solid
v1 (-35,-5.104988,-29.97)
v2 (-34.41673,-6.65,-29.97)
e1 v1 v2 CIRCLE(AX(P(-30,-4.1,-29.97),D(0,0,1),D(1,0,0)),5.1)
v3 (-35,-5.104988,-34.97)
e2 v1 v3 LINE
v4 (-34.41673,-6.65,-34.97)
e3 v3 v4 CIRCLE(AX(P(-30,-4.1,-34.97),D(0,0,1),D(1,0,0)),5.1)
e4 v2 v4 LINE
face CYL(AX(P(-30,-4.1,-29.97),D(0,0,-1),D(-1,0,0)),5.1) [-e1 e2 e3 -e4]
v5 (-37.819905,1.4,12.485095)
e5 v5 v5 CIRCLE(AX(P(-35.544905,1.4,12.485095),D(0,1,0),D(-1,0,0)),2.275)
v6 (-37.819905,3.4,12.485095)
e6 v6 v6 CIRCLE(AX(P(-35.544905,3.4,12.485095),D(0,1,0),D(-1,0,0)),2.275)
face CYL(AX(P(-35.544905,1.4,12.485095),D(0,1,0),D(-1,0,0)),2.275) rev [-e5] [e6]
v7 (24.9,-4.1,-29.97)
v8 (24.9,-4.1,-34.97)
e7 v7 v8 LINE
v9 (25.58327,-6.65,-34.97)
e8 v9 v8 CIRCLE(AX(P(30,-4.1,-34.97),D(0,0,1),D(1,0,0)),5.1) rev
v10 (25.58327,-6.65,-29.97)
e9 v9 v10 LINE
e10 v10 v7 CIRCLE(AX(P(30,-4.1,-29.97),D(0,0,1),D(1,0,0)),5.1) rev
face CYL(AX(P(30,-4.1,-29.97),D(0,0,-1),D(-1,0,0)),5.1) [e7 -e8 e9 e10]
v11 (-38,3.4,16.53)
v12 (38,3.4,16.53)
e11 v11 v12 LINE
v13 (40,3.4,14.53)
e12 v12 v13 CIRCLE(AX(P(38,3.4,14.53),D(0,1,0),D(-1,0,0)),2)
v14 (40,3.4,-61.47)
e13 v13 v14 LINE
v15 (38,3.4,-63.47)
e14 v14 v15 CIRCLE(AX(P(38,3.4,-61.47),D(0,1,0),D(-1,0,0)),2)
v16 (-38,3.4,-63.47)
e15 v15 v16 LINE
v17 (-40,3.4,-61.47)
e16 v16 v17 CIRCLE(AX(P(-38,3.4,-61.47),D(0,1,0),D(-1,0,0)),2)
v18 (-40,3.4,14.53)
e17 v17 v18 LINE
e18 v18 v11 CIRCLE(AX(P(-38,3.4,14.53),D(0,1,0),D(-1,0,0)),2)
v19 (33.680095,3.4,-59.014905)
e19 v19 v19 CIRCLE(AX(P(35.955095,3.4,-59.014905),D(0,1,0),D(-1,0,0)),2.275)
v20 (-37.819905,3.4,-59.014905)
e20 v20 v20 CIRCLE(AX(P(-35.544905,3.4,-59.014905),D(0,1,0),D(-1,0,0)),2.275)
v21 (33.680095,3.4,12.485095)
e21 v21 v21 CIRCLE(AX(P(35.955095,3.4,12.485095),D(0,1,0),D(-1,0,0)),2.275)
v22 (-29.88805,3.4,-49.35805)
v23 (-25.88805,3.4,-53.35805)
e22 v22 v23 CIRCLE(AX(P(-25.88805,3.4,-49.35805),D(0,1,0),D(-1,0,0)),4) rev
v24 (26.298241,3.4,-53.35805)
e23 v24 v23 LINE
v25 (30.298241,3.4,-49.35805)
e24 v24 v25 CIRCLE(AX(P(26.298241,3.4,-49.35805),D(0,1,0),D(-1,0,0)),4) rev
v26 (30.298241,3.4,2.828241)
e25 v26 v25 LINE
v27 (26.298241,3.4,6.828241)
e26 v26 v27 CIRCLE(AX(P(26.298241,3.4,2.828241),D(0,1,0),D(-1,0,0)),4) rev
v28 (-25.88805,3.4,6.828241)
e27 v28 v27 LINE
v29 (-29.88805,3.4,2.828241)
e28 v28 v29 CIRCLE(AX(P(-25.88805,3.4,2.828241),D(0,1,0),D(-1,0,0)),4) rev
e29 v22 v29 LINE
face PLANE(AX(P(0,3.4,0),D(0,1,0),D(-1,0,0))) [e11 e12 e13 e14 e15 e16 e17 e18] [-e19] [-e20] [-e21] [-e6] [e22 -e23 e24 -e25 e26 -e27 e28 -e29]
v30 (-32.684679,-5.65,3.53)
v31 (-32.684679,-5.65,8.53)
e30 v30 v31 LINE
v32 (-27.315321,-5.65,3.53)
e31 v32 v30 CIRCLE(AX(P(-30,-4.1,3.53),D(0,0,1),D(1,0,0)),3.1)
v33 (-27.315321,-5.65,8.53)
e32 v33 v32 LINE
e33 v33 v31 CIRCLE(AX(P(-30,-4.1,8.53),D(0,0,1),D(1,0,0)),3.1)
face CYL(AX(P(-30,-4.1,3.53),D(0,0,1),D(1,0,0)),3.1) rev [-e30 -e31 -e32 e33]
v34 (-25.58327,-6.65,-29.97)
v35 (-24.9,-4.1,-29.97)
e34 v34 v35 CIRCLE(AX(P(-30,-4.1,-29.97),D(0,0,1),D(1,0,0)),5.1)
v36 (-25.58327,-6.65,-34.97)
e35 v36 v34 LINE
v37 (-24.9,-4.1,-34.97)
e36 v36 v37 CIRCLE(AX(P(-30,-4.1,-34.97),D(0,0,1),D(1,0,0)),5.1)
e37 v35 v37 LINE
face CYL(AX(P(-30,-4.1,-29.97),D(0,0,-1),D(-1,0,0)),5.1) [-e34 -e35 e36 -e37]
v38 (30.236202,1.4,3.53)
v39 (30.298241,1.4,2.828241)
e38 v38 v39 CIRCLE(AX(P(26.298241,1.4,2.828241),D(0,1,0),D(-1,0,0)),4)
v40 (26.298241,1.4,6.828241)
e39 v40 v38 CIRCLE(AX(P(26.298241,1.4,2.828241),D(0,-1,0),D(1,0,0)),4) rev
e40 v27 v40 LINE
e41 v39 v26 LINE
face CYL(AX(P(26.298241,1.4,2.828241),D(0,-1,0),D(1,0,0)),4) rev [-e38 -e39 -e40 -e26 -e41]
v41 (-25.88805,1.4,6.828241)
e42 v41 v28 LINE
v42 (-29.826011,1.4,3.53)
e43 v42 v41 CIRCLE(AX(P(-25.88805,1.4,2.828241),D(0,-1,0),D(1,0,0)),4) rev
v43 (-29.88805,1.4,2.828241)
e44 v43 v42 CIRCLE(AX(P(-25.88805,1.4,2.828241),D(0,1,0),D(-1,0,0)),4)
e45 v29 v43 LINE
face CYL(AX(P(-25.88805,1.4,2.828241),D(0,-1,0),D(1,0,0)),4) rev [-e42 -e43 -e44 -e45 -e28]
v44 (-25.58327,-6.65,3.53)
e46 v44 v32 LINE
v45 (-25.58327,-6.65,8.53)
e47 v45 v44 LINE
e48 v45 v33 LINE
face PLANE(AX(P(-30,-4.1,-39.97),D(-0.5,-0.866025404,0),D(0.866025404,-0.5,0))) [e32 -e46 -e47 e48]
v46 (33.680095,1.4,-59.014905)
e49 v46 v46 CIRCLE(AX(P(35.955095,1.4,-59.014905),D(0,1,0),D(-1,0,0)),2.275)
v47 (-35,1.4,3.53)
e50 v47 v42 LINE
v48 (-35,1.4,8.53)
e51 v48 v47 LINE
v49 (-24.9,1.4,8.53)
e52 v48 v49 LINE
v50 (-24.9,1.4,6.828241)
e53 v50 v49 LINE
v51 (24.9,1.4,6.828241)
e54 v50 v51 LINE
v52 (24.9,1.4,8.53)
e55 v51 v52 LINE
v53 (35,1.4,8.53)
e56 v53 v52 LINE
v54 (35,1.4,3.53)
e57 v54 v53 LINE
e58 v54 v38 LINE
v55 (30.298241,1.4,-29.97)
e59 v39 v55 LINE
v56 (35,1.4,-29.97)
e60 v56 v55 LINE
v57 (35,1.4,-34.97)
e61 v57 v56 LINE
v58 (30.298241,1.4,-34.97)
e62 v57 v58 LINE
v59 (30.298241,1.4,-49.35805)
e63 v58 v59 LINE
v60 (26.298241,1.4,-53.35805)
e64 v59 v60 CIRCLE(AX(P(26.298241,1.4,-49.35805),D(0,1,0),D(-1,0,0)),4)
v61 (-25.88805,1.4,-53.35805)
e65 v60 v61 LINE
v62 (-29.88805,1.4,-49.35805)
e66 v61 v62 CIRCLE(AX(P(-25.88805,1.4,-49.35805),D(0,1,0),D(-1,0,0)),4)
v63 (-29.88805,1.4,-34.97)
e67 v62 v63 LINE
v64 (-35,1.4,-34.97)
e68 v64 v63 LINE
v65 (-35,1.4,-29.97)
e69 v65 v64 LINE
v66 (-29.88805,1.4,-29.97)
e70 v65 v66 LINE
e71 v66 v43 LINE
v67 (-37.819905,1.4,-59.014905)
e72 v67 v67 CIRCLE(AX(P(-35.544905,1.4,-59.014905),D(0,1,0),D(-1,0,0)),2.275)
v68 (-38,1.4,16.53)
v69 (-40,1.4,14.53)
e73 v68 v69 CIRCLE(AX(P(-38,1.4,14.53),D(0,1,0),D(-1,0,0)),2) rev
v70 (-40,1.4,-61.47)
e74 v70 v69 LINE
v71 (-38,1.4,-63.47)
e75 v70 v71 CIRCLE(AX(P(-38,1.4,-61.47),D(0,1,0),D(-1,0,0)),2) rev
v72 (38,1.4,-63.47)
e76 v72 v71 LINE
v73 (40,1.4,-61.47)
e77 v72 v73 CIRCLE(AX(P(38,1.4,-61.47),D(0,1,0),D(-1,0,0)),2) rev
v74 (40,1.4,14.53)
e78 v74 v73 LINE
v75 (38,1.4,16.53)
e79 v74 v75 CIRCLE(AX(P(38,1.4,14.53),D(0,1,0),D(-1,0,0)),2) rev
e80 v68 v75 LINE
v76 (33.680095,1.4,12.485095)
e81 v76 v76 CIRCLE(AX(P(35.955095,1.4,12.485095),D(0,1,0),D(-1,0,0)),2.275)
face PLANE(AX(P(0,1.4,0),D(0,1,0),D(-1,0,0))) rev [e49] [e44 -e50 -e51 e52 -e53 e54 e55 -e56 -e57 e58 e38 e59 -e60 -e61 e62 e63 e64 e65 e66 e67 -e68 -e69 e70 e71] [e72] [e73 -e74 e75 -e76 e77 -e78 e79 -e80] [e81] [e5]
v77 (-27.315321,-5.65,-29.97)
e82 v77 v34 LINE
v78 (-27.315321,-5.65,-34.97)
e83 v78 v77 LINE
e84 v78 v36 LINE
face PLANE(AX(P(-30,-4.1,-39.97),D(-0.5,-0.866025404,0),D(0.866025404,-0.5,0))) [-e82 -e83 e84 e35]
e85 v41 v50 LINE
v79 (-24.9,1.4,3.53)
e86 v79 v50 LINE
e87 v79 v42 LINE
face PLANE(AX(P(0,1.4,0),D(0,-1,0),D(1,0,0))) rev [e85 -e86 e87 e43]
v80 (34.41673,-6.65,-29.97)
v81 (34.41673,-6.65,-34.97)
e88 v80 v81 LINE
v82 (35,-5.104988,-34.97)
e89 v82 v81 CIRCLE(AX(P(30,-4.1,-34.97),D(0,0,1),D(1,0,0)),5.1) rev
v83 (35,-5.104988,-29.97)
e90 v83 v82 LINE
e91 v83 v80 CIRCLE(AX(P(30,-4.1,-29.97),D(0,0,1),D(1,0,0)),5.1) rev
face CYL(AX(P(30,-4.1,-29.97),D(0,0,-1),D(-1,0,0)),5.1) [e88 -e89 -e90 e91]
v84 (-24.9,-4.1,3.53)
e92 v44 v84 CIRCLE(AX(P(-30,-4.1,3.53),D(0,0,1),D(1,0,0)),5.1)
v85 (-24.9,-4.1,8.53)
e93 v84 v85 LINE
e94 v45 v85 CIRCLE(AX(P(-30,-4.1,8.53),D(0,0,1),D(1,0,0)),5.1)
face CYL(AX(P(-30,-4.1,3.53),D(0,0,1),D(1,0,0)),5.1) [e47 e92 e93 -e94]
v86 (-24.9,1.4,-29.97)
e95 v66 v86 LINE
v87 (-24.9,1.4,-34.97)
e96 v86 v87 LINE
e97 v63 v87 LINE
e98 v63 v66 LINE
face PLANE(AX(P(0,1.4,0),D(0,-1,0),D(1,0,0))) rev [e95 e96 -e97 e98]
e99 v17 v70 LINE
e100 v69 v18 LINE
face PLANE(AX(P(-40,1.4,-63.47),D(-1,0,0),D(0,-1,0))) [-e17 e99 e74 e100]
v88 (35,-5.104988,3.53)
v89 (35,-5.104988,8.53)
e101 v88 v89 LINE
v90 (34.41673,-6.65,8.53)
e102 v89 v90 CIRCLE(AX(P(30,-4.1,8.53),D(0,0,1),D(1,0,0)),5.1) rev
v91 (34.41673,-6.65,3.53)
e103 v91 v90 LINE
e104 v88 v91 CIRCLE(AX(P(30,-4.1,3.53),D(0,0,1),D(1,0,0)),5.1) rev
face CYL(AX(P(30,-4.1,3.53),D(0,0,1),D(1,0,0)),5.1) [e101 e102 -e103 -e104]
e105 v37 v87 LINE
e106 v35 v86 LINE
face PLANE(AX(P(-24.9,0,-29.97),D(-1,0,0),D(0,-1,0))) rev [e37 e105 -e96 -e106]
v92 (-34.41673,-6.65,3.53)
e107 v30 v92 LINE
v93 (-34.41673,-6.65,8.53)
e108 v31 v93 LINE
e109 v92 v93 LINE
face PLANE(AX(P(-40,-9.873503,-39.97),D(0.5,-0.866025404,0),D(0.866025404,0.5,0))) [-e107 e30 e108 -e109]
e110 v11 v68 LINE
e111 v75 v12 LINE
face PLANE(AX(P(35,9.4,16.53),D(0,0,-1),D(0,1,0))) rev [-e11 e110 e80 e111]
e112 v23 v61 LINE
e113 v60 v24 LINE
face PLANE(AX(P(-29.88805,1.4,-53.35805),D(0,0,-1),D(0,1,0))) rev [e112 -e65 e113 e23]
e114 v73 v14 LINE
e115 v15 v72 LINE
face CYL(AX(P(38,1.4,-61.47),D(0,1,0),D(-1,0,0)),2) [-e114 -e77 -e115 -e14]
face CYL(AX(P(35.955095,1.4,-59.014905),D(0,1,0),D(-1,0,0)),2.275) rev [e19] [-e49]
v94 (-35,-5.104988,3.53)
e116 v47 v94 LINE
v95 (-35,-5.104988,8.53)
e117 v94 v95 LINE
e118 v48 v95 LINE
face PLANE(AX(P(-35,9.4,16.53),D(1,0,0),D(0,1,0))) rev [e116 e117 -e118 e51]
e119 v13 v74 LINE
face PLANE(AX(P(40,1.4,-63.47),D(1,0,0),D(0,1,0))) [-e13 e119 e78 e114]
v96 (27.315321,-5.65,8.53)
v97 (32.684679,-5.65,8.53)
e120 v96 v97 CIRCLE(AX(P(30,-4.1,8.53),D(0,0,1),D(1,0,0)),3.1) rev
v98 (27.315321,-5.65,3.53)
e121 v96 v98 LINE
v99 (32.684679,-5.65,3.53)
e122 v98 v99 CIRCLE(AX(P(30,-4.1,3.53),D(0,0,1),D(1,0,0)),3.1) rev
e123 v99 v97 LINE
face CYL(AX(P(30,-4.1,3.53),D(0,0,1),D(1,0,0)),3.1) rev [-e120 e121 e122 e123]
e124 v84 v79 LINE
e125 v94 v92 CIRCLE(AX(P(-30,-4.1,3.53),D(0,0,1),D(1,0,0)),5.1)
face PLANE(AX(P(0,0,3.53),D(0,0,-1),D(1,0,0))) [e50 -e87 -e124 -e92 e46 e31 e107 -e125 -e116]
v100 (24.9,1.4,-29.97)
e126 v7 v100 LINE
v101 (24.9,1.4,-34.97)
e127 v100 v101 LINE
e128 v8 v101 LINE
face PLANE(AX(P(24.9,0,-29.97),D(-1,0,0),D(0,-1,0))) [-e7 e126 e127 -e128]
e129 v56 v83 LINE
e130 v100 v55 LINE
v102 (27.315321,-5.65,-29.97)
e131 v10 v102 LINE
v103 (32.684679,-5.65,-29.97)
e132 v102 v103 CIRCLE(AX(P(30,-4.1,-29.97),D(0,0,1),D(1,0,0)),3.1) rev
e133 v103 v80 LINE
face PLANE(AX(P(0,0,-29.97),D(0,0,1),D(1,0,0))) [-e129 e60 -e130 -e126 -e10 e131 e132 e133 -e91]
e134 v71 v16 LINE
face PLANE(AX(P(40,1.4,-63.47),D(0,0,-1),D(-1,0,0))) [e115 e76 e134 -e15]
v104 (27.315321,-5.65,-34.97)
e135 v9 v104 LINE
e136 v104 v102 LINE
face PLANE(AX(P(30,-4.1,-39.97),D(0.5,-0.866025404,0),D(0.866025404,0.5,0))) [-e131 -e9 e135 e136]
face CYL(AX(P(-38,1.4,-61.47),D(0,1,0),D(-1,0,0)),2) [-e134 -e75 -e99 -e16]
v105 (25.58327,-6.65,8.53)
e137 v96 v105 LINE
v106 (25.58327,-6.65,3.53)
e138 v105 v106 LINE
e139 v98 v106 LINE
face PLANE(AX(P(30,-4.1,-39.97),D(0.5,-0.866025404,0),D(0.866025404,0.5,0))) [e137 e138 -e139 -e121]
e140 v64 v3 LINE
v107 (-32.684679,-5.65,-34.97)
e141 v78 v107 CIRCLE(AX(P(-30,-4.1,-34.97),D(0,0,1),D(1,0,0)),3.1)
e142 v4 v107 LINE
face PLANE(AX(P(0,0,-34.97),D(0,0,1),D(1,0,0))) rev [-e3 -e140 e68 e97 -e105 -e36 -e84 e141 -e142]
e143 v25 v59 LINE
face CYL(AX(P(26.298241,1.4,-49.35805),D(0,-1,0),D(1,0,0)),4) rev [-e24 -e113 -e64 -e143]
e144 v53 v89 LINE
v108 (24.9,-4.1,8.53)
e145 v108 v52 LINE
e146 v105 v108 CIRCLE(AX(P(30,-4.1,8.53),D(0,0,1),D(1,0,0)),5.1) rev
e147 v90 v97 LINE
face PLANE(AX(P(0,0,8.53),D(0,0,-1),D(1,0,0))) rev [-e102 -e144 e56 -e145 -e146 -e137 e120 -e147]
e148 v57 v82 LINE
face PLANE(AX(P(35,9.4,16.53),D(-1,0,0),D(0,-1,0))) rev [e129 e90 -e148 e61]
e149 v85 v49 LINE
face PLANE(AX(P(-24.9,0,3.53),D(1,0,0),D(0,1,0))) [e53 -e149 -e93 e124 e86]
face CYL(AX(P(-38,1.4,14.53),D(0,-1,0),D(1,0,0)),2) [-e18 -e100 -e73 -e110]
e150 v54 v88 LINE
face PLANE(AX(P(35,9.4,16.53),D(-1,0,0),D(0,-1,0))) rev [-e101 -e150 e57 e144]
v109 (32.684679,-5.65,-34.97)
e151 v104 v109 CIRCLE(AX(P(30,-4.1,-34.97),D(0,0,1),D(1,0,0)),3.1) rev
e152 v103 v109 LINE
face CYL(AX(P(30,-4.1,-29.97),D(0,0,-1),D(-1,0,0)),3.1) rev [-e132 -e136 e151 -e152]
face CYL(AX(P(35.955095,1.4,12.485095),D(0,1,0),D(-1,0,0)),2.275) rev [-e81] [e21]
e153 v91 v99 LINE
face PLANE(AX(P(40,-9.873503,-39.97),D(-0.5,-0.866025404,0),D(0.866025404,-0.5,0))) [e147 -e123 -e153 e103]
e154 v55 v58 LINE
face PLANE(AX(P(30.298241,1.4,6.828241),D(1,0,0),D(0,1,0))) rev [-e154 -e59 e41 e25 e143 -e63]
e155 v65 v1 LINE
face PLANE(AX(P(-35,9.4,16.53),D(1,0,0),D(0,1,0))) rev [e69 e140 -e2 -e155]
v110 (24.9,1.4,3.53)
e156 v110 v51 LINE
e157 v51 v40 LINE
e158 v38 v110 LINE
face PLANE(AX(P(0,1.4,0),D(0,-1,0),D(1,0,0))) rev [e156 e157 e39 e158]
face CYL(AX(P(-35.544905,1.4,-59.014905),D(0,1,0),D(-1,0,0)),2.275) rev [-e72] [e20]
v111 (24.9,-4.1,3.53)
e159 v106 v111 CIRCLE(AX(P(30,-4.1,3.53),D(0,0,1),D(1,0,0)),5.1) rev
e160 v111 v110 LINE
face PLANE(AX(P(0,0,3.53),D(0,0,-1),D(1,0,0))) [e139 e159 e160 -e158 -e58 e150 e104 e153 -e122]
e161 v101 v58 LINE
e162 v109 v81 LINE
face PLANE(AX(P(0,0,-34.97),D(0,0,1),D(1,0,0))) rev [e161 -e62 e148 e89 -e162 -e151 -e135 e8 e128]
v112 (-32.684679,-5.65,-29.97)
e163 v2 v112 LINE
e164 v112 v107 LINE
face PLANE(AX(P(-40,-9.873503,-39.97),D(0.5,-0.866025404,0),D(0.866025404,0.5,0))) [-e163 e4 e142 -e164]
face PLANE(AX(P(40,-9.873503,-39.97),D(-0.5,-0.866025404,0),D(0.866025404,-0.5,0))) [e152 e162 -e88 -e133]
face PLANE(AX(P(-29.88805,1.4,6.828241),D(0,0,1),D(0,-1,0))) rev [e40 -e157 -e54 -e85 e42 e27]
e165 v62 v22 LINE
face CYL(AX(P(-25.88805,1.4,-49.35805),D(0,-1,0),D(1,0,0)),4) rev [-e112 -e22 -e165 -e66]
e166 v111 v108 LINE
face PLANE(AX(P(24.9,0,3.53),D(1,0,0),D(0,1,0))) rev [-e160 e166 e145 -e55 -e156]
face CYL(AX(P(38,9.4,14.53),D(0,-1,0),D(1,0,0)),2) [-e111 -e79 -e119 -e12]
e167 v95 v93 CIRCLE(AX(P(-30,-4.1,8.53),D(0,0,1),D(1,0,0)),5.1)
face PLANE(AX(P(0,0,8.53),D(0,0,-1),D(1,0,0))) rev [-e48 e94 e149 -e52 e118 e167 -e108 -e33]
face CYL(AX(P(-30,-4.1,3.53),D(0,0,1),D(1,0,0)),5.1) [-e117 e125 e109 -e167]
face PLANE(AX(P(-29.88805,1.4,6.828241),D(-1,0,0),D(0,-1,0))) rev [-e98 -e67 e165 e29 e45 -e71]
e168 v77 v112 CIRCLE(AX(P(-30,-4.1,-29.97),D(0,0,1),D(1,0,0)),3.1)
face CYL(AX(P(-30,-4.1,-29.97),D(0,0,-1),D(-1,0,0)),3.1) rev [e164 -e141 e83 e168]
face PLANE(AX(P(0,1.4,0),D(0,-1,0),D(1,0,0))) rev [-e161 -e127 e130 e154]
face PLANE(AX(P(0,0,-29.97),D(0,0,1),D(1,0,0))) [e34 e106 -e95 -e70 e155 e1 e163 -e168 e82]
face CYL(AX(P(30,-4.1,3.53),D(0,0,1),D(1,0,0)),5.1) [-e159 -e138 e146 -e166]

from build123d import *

# Parameters (mm, degrees)
SKETCH1_W               = 70
SKETCH1_H               = 57.5
BOSS_EXTRUDE1_DEPTH     = 8
BOSS_EXTRUDE2_START     = -2
SKETCH3_R               = 3.1
BOSS_EXTRUDE2_DEPTH     = 5
CUT_EXTRUDE1_DEPTH      = 10
CUT_EXTRUDE1_DEPTH_BACK = 63
MOVE_FACE1_BY           = 6
SKETCH5_W               = 80
SKETCH5_H               = 80
BOSS_EXTRUDE3_DEPTH     = 2
FILLET1_R               = 2
SKETCH6_R               = 2.275
CUT_EXTRUDE2_DEPTH      = 2
SKETCH7_W               = 60.186291501
SKETCH7_H               = 60.186291501
CUT_EXTRUDE3_DEPTH      = 2
FILLET2_R               = 4


with BuildPart() as part:
    # Sketch1 → Boss-Extrude1 (new body)
    with BuildSketch(Plane(origin=(0, 1.4, 0), x_dir=(1, 0, 0), z_dir=(0, 1, 0))):
        with Locations((0, 12.22)):
            Rectangle(SKETCH1_W, SKETCH1_H)
    extrude(amount=BOSS_EXTRUDE1_DEPTH)

    # Sketch3 → Boss-Extrude2 (add)
    # profile 1 of 2: a face of its own
    with BuildSketch(Plane(origin=(0, 0, -36.97), x_dir=(-1, 0, 0), z_dir=(0, 0, -1)).offset(BOSS_EXTRUDE2_START)):
        with BuildLine():
            ThreePointArc((-35, -5.104987562), (-29.495024753, -9.174938423), (-24.9, -4.1))
            Line((-24.9, -4.1), (-24.9, 1.4))
            Line((-24.9, 1.4), (-35, 1.4))
            Line((-35, 1.4), (-35, -5.104987562))
        make_face()
        with Locations(Location((-30, -4.1, 0), (0, 0, 180))):
            Circle(SKETCH3_R, mode=Mode.SUBTRACT)
    # profile 2 of 2: a face of its own
    with BuildSketch(Plane(origin=(0, 0, -36.97), x_dir=(-1, 0, 0), z_dir=(0, 0, -1)).offset(BOSS_EXTRUDE2_START)):
        with BuildLine():
            Line((35, 1.4), (35, -5.104987562))
            ThreePointArc((35, -5.104987562), (29.495024753, -9.174938423), (24.9, -4.1))
            Line((24.9, -4.1), (24.9, 1.4))
            Line((24.9, 1.4), (35, 1.4))
        make_face()
        with Locations(Location((30, -4.1, 0), (0, 0, 180))):
            Circle(SKETCH3_R, mode=Mode.SUBTRACT)
    boss_extrude2 = extrude(amount=-BOSS_EXTRUDE2_DEPTH)

    # Mirror1: Boss-Extrude2 across plane
    add(boss_extrude2.mirror(Plane.XY.offset(-13.22)))

    # Sketch4 → Cut-Extrude1 (cut, two sides: drawn at the far end of the back side and taken through both)
    with BuildSketch(Plane(origin=(0, 0, -29.97), x_dir=(-1, 0, 0), z_dir=(0, 0, -1)).offset(-CUT_EXTRUDE1_DEPTH_BACK)):
        Polygon((-30, -4.1), (-20, -9.873502692), (-40, -9.873502692), align=None)
        Polygon((20, -9.873502692), (40, -9.873502692), (30, -4.1), align=None)
    extrude(amount=CUT_EXTRUDE1_DEPTH + CUT_EXTRUDE1_DEPTH_BACK, mode=Mode.SUBTRACT)

    # Move Face1: a face moved inward by 6.0
    extrude(part.faces().sort_by_distance((0, 9.4, -12.22))[0], amount=MOVE_FACE1_BY, dir=(0, -1, 0), mode=Mode.SUBTRACT)

    # Sketch5 → Boss-Extrude3 (add)
    with BuildSketch(Plane(origin=(0, 3.4, 0), x_dir=(1, 0, 0), z_dir=(0, 1, 0))):
        with Locations((0, 23.47)):
            Rectangle(SKETCH5_W, SKETCH5_H)
    extrude(amount=-BOSS_EXTRUDE3_DEPTH)

    # Fillet1
    fillet1_edges = [part.edges().sort_by_distance(p)[0] for p in [
        (40, 2.4, 16.53),
        (-40, 2.4, 16.53),
        (-40, 2.4, -63.47),
        (40, 2.4, -63.47),
    ]]
    fillet(fillet1_edges, radius=FILLET1_R)

    # Sketch6 → Cut-Extrude2 (cut)
    with BuildSketch(Plane(origin=(0, 3.4, 0), x_dir=(1, 0, 0), z_dir=(0, 1, 0))):
        with Locations(Location((35.955095469, 59.014904531, 0), (0, 0, 180))):
            Circle(SKETCH6_R)
        with Locations(Location((35.955095469, -12.485095469, 0), (0, 0, 180))):
            Circle(SKETCH6_R)
        with Locations(Location((-35.544904531, 59.014904531, 0), (0, 0, 180))):
            Circle(SKETCH6_R)
        with Locations(Location((-35.544904531, -12.485095469, 0), (0, 0, 180))):
            Circle(SKETCH6_R)
    extrude(amount=-CUT_EXTRUDE2_DEPTH, mode=Mode.SUBTRACT)

    # Sketch7 → Cut-Extrude3 (cut)
    with BuildSketch(Plane(origin=(0, 3.4, 0), x_dir=(1, 0, 0), z_dir=(0, 1, 0))):
        with Locations((0.205095468, 23.264904532)):
            Rectangle(SKETCH7_W, SKETCH7_H)
    extrude(amount=-CUT_EXTRUDE3_DEPTH, mode=Mode.SUBTRACT)

    # Fillet2
    # the kernel refuses this fillet: 4 mm, written as the material it adds along each edge
    with BuildSketch(Plane(origin=(30.298241219, 3.4, -53.358050282), x_dir=(-1, 0, 0), z_dir=(0, -1, 0)), Plane(origin=(30.298241219, 3.4, 6.828241219), x_dir=(0, 0, -1), z_dir=(0, -1, 0)), Plane(origin=(-29.888050282, 3.4, -53.358050282), x_dir=(0, 0, 1), z_dir=(0, -1, 0))) as fillet2_piece_1:
        with BuildLine():
            CenterArc((FILLET2_R, -FILLET2_R), FILLET2_R, 90, 90)
            Line((0, -FILLET2_R), (0, 0))
            Line((0, 0), (FILLET2_R, 0))
        make_face()
    extrude(amount=2)
    with BuildSketch(Plane(origin=(-29.888050282, 3.4, 6.828241219), x_dir=(0, 0, -1), z_dir=(0, -1, 0))) as fillet2_piece_2:
        with BuildLine():
            CenterArc((FILLET2_R, FILLET2_R), FILLET2_R, 180, 90)
            Line((0, FILLET2_R), (0, 0))
            Line((0, 0), (FILLET2_R, 0))
        make_face()
    extrude(amount=2)


solid = part.part
